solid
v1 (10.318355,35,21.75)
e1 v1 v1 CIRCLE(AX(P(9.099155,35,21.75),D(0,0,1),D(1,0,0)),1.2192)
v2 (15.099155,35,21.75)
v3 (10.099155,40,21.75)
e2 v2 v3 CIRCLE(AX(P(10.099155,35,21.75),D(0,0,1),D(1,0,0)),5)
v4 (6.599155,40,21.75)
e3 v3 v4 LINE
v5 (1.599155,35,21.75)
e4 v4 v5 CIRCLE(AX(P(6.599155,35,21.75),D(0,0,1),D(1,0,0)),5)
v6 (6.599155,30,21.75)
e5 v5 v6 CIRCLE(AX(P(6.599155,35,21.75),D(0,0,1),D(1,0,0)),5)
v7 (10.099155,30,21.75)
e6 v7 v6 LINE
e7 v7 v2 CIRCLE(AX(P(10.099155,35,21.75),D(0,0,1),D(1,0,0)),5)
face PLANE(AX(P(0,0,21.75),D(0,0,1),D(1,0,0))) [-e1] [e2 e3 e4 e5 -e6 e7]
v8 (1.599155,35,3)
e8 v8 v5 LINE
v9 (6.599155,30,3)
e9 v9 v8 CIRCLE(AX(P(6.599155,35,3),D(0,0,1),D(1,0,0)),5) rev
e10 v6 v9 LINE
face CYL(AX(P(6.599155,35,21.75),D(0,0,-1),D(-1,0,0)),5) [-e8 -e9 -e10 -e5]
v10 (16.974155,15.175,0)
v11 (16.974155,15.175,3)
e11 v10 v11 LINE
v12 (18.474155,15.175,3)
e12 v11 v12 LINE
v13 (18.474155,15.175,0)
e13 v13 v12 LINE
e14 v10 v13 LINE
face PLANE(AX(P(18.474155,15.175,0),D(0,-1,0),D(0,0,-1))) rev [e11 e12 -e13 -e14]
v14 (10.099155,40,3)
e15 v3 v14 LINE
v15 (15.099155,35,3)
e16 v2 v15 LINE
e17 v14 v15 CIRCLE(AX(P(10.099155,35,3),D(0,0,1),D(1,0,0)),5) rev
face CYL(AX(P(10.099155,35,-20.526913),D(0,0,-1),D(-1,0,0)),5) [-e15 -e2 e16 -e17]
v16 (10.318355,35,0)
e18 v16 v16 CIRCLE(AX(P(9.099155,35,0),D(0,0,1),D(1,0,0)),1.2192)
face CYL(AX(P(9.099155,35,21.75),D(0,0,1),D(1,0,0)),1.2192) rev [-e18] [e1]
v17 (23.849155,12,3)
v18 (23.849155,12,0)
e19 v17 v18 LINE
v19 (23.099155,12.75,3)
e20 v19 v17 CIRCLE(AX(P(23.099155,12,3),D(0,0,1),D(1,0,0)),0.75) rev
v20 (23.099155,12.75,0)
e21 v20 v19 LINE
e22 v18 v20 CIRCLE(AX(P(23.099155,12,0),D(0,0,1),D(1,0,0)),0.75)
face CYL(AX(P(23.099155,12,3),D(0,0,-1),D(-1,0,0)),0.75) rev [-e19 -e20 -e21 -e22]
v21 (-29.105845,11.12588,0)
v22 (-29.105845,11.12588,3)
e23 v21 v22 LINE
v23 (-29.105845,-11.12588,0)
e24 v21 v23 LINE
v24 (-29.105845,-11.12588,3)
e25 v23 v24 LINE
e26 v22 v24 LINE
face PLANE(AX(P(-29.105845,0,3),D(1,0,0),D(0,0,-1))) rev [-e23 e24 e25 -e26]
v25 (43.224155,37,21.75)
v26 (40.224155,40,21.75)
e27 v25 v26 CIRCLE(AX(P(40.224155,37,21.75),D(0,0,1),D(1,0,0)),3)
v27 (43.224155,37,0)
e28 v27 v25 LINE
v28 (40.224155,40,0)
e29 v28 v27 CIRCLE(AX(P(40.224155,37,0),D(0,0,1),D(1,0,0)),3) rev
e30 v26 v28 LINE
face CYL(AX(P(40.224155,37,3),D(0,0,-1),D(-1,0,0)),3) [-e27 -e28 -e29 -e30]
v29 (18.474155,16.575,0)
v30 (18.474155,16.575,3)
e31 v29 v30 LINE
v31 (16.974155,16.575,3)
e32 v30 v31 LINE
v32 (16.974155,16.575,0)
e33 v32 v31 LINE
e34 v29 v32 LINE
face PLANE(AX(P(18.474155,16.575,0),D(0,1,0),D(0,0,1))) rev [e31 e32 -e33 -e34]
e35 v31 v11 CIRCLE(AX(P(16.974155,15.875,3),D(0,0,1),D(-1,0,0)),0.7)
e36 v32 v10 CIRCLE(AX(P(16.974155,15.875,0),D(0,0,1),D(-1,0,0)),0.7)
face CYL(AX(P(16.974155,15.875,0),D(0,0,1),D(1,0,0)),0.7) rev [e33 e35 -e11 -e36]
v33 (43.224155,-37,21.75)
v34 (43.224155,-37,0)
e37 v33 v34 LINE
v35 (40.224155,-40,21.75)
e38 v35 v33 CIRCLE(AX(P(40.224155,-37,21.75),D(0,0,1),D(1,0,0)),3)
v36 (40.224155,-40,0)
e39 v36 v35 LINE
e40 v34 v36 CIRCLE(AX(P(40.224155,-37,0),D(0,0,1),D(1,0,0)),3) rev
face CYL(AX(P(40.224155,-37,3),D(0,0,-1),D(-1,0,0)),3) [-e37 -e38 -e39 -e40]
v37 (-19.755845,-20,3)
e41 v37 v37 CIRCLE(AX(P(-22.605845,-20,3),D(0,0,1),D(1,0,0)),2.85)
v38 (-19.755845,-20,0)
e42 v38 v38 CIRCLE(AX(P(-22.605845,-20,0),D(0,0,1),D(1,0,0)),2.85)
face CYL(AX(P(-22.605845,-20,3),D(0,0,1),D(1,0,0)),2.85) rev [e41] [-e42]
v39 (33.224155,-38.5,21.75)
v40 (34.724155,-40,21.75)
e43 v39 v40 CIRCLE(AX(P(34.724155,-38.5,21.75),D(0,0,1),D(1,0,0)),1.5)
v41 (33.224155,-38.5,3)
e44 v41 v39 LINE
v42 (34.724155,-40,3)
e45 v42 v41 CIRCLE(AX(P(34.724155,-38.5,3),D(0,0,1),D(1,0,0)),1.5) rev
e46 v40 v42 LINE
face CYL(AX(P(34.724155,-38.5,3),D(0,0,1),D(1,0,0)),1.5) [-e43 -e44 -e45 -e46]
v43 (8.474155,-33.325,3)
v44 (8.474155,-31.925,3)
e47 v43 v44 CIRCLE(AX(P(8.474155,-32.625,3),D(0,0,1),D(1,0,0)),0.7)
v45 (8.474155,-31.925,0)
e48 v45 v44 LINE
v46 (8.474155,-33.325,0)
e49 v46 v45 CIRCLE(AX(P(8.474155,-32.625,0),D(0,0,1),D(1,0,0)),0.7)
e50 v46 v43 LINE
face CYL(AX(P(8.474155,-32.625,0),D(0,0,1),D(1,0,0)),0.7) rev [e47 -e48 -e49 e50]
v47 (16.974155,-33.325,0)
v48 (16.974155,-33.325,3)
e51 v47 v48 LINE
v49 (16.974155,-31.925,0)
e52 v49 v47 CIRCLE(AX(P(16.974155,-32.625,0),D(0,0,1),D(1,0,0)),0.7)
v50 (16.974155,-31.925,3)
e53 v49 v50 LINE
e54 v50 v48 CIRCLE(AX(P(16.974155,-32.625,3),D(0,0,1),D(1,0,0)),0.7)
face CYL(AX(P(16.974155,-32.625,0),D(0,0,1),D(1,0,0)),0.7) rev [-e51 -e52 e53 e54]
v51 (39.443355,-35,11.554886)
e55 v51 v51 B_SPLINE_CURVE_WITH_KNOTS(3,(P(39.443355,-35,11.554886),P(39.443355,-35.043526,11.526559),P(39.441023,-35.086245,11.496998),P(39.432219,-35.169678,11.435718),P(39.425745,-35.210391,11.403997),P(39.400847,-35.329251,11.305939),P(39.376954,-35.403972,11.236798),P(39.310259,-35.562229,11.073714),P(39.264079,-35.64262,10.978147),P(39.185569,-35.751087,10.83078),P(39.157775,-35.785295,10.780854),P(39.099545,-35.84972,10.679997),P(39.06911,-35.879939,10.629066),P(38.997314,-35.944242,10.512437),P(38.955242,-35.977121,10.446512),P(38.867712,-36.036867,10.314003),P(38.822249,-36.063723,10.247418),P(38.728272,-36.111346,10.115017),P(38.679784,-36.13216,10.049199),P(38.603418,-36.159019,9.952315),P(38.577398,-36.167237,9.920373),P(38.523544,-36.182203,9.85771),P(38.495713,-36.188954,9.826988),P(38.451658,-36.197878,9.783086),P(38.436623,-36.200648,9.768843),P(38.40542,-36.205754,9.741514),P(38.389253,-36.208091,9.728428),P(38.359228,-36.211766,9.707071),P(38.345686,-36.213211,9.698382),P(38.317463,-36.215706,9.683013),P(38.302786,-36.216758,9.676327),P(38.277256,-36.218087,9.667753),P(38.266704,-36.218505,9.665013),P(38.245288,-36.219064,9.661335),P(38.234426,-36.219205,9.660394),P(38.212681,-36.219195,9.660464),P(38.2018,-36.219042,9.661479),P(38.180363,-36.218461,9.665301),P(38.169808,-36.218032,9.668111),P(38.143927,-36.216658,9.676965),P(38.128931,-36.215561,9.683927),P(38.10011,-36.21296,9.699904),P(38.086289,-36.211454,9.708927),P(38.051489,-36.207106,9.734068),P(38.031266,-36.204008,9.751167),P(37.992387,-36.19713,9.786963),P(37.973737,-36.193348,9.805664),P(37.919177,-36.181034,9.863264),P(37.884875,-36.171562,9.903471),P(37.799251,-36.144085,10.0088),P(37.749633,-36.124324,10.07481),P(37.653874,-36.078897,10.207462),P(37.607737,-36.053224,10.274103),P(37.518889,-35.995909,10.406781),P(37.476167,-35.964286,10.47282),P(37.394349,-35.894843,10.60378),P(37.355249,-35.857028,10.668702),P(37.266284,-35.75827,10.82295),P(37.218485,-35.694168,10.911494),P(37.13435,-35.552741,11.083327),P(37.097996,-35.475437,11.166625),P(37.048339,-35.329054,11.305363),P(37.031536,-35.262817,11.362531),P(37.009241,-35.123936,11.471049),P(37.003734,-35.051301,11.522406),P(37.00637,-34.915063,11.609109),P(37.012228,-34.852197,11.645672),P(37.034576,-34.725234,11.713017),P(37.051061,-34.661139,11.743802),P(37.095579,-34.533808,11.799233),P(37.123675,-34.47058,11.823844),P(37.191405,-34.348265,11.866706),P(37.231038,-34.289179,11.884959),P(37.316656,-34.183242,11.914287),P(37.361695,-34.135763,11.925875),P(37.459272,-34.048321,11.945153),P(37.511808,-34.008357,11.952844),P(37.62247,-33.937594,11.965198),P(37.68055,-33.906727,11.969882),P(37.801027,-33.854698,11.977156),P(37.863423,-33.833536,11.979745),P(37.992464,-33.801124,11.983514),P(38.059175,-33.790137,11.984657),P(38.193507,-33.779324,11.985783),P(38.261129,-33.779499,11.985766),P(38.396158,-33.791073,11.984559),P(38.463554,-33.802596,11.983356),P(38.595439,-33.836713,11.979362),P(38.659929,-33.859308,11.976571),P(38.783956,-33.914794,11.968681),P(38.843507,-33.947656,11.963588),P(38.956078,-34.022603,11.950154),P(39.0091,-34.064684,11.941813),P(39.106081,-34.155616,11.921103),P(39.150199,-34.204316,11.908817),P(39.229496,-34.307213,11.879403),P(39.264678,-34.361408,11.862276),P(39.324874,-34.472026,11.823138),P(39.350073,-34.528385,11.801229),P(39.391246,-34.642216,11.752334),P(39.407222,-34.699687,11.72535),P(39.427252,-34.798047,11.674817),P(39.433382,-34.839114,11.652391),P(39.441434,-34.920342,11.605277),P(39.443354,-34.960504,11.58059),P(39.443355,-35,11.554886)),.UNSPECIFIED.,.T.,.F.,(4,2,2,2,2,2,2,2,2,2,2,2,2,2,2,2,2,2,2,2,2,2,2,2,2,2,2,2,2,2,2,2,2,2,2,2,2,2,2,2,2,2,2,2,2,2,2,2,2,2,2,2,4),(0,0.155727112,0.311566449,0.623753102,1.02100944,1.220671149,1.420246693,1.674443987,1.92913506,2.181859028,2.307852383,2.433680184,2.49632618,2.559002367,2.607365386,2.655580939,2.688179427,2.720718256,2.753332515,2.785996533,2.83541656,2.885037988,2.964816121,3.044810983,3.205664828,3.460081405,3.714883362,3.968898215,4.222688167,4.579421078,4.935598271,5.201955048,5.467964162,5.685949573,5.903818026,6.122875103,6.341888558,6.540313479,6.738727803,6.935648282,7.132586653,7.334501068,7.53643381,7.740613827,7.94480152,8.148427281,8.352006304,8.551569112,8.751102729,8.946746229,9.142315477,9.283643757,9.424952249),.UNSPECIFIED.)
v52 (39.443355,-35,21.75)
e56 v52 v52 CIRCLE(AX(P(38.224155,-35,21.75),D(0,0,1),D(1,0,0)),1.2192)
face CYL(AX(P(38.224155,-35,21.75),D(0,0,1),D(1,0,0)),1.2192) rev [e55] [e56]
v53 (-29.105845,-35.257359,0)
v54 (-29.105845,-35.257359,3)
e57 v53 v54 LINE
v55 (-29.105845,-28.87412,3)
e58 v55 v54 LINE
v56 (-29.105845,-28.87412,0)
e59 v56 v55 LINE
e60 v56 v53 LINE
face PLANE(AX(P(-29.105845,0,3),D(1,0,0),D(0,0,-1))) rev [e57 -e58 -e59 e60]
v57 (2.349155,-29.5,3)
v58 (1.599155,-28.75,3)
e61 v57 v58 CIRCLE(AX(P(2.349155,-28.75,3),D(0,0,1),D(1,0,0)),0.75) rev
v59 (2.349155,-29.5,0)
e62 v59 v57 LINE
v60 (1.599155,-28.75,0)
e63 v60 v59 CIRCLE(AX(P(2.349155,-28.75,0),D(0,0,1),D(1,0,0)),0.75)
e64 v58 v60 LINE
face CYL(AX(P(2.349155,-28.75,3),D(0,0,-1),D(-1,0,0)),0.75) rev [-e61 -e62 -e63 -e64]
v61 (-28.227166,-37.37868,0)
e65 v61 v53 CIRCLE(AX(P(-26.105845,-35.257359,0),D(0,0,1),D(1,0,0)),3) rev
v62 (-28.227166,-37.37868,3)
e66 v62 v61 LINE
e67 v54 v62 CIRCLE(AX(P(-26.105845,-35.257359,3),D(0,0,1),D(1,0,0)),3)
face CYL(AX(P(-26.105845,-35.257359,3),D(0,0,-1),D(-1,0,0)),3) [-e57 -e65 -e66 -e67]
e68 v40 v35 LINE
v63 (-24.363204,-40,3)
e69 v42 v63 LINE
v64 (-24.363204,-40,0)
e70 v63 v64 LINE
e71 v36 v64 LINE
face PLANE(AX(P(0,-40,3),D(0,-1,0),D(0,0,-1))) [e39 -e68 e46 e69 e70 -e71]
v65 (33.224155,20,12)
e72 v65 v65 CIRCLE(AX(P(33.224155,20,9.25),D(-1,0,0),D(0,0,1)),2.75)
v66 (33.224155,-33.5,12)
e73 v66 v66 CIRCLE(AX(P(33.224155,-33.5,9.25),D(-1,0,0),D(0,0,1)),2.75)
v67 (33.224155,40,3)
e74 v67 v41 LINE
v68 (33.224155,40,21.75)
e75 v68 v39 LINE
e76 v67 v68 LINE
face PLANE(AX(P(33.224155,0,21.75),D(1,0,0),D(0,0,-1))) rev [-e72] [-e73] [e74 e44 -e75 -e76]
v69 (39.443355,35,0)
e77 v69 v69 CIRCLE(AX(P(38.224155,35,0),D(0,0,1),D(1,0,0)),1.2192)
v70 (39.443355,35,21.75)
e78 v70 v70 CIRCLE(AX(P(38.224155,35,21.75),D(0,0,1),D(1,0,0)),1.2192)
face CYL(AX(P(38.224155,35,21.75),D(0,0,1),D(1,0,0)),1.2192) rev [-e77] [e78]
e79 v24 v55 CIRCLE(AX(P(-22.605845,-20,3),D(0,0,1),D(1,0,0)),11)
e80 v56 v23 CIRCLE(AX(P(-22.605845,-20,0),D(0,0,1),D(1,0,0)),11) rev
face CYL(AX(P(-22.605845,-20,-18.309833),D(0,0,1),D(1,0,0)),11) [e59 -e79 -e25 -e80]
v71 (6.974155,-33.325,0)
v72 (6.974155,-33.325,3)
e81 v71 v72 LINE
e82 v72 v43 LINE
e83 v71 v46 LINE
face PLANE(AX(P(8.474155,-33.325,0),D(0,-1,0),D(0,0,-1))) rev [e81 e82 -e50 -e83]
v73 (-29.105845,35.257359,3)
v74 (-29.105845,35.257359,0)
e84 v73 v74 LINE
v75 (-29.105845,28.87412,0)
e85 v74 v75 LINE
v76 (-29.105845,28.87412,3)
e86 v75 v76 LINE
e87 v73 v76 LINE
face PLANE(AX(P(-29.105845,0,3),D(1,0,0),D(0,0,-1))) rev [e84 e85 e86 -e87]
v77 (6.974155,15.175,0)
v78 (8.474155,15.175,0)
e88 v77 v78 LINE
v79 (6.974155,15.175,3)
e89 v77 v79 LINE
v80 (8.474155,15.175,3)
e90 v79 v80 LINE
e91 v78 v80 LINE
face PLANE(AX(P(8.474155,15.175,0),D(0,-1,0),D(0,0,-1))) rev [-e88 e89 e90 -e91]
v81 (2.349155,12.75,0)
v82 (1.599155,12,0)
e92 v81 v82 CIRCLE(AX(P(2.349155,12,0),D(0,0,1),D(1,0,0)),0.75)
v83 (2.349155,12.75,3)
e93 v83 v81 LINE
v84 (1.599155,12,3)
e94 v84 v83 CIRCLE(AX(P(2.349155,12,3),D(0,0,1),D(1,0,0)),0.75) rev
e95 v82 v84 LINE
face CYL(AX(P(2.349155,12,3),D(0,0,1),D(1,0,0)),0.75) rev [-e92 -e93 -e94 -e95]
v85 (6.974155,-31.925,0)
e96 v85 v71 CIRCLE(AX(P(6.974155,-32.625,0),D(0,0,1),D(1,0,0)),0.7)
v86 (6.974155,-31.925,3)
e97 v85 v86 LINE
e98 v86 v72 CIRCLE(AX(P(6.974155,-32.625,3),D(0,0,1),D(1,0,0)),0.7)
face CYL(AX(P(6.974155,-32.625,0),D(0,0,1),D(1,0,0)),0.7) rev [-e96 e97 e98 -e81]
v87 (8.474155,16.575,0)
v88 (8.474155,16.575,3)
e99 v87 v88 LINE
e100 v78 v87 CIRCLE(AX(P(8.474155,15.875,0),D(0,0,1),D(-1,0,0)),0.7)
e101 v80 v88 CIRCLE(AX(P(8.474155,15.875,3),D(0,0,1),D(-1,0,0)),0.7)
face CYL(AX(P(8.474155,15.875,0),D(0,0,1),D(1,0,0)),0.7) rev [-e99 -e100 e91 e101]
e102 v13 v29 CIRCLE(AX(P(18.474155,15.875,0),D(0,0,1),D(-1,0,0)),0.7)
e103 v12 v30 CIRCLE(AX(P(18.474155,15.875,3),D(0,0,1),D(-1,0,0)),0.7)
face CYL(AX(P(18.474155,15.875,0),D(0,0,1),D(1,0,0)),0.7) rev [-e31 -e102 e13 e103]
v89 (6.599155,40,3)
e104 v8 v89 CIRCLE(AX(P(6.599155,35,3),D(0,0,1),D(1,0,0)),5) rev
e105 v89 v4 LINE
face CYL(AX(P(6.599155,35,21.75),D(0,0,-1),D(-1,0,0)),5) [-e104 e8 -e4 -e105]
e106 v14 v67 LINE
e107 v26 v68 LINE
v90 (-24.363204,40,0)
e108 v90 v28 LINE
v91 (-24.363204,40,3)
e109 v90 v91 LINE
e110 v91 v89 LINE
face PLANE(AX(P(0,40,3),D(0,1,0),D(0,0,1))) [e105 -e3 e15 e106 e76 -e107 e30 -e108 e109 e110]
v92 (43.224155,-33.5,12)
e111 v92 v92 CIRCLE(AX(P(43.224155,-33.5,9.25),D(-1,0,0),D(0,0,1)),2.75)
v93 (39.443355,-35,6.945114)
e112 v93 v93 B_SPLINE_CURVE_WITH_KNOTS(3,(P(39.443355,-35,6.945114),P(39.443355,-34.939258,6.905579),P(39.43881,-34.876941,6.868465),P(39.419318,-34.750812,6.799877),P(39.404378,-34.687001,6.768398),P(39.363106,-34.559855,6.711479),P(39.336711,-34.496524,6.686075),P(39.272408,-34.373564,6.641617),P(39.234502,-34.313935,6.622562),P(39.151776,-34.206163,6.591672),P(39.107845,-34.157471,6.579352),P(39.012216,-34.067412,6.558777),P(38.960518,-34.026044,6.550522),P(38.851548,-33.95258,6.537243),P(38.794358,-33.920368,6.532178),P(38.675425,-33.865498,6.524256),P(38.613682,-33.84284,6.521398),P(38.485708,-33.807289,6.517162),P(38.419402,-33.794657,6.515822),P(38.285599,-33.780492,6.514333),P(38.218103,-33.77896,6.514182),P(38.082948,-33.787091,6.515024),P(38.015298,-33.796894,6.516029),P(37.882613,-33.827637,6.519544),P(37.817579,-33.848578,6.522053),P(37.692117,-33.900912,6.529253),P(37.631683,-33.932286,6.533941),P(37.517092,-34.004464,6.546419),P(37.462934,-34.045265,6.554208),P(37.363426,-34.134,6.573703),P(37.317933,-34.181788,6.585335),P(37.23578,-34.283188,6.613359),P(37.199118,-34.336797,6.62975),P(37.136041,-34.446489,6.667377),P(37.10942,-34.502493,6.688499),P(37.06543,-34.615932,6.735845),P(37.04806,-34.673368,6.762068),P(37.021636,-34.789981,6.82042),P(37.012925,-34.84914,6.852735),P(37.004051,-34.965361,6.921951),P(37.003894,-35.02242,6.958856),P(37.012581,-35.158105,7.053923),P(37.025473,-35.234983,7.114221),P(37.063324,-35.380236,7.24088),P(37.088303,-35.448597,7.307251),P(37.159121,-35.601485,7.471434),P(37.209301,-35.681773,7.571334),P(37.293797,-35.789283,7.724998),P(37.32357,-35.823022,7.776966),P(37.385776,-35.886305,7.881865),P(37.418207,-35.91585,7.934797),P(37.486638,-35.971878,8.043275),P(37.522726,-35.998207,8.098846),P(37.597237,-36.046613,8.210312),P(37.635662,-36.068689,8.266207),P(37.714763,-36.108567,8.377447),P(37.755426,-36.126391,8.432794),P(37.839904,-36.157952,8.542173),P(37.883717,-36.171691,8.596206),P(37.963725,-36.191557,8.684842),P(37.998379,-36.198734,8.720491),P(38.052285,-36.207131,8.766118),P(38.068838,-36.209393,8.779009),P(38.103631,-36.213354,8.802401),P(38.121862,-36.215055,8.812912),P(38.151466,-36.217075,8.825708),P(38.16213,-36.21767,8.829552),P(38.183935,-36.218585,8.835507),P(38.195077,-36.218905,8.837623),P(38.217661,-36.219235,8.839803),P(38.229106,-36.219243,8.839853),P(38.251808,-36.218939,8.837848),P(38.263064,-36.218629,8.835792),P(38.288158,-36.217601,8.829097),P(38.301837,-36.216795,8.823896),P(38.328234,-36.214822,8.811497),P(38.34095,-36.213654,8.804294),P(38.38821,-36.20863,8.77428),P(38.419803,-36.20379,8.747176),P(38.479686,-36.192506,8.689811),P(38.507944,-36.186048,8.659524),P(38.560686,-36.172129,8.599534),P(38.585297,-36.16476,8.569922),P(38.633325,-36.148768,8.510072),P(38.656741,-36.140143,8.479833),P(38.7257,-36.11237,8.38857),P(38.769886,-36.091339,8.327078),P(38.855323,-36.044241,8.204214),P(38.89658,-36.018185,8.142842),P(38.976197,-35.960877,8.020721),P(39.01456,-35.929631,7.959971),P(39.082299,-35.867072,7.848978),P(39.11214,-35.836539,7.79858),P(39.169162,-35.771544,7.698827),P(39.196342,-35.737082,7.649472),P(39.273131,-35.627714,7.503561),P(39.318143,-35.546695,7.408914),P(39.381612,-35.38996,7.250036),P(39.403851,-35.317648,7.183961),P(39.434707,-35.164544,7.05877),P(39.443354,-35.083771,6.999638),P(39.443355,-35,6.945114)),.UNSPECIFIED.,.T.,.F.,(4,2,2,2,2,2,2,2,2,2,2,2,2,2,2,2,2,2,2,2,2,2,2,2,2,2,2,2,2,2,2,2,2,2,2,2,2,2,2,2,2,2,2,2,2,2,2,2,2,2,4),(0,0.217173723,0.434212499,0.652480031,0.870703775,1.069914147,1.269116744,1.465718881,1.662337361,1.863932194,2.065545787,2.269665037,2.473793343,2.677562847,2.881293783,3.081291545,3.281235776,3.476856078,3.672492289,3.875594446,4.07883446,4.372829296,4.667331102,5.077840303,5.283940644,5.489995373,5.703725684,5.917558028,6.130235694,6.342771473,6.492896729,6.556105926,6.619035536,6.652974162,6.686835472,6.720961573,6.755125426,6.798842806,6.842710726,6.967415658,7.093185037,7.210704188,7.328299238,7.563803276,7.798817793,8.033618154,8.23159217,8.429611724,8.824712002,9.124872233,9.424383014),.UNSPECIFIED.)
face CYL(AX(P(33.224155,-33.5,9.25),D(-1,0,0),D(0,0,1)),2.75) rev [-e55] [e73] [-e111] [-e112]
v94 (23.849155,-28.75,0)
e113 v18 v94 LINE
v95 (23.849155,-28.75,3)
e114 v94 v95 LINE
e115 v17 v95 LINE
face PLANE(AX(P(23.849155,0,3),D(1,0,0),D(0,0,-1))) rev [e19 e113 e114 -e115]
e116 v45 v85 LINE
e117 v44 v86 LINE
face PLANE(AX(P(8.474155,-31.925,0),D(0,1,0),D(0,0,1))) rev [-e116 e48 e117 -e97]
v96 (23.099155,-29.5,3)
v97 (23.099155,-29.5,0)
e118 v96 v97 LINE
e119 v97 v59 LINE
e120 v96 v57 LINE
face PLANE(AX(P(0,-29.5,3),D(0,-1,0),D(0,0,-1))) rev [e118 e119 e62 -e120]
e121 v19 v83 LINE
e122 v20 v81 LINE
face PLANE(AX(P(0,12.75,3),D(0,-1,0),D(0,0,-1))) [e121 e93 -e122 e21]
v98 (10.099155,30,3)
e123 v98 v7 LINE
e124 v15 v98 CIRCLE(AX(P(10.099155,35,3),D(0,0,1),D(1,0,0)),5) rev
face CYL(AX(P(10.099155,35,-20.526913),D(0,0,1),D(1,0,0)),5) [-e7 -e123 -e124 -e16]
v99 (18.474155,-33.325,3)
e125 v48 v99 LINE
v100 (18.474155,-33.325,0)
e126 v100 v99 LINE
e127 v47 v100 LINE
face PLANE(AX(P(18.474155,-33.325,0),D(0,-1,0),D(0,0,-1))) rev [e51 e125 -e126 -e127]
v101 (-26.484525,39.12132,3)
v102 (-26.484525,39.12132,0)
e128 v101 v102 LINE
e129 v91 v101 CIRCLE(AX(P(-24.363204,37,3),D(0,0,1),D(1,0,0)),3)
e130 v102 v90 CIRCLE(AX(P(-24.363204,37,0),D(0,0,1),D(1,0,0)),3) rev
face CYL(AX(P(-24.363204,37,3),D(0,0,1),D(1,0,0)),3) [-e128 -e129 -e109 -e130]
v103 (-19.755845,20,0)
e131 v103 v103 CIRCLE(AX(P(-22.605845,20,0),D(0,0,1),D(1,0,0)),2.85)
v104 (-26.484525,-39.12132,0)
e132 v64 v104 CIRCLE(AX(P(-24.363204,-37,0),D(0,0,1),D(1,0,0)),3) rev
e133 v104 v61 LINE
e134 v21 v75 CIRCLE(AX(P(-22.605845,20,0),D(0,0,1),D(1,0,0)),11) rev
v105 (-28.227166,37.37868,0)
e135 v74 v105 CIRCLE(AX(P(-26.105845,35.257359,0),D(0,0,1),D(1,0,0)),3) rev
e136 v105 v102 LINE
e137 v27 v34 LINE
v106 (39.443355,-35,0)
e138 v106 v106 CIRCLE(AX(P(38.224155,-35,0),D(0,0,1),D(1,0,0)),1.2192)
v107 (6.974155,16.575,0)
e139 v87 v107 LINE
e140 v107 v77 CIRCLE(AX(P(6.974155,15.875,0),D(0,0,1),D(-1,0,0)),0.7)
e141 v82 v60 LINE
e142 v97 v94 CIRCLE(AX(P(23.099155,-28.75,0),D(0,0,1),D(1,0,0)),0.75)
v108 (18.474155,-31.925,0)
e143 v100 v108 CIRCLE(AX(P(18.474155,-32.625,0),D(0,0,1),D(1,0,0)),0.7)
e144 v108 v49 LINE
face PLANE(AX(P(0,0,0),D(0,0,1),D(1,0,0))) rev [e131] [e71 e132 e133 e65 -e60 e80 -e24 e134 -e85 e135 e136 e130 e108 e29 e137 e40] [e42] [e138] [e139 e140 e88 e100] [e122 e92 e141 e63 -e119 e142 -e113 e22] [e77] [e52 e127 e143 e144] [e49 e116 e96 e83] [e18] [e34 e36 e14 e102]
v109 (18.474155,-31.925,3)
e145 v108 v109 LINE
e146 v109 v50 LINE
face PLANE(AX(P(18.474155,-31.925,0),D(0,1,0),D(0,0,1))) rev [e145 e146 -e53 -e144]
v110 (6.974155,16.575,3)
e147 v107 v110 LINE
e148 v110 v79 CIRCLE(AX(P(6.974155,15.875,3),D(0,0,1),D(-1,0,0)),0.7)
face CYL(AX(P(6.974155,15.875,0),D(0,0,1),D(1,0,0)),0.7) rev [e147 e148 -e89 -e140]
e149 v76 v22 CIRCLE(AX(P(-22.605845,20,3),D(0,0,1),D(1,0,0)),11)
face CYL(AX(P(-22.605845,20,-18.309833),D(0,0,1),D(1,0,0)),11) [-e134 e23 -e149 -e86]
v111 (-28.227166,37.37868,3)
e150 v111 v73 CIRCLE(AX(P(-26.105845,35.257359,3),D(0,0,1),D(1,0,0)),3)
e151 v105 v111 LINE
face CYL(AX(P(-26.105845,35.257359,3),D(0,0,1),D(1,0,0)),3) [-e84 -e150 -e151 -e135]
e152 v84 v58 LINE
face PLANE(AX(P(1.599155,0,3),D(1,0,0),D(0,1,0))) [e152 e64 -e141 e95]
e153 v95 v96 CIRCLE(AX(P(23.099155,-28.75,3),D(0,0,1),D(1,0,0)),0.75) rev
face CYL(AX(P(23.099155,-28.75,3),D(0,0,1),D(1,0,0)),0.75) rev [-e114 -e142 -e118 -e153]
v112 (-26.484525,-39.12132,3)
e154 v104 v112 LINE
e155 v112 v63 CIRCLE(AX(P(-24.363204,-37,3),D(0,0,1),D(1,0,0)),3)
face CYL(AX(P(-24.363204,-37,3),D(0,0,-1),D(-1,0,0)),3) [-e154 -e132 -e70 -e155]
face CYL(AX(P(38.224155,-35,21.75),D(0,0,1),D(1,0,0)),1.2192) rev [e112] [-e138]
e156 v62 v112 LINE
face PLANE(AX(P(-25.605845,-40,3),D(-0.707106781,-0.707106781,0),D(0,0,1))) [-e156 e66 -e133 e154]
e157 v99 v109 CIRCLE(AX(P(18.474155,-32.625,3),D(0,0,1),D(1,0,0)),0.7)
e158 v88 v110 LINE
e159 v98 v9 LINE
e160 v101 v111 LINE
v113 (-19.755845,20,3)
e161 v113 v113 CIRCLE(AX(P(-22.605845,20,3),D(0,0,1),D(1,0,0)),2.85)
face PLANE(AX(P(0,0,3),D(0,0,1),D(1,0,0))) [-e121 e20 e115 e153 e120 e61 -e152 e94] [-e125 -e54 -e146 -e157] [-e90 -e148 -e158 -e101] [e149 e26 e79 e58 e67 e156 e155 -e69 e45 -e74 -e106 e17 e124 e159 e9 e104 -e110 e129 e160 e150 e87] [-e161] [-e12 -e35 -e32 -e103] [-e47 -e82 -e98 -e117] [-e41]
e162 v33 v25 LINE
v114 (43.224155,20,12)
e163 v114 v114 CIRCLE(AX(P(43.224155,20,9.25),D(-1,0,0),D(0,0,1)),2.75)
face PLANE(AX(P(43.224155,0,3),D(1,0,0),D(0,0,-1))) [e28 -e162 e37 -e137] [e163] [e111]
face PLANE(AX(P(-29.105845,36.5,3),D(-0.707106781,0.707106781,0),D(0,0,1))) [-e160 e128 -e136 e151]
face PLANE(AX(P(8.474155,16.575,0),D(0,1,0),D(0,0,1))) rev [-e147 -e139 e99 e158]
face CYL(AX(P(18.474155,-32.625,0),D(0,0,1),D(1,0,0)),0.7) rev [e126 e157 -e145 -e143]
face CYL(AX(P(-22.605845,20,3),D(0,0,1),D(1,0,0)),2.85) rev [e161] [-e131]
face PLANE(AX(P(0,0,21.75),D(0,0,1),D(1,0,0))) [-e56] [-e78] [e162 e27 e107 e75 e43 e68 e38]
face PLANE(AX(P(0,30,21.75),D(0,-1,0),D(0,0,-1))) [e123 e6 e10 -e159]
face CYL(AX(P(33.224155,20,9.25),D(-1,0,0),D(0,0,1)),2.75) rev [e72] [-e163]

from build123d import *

# Parameters (mm, degrees)
BASE_W                 = 22.25
BASE_H                 = 42.25
MAIN_DEPTH             = 3
GEAR_AXIS_HOLES_D      = 5.7
M1_6_CLEARANCE_HOLE1_D = 1.4
BOSS_EXTRUDE1_DEPTH    = 18.75
FILLET2_R              = 0.75
FILLET4_R              = 5
FILLET8_R              = 1.5
BOSS_EXTRUDE2_DEPTH    = 3
CHAMFER1_SIZE          = 3.5
FILLET6_R              = 3
CUT_EXTRUDE1_DEPTH     = 62.805259158
F_2_CLEARANCE_HOLE1_D  = 2.4384
M5_CLEARANCE_HOLE1_D   = 5.5
SKETCH20_W             = 18.125
SKETCH20_H             = 15
CUT_EXTRUDE2_DEPTH     = 18.75
FILLET7_R              = 5


with BuildPart() as part:
    # Base → Main (new body)
    with BuildSketch(Plane.XY):
        Polygon((-29.105845183, 40), (-29.105845183, -40), (-17.775845183, -40), (43.224154817, -40), (43.224154817, 40), align=None)
        with Locations((12.724154817, -8.375)):
            Rectangle(BASE_W, BASE_H, mode=Mode.SUBTRACT)
    extrude(amount=MAIN_DEPTH)

    # Gear Axis Holes (through all)
    with Locations(Plane(origin=(0, 0, 3), x_dir=(-1, 0, 0), z_dir=(0, 0, 1))):
        with Locations((22.605845183, 20), (22.605845183, -20)):
            Hole(GEAR_AXIS_HOLES_D / 2)

    # M1.6 Clearance Hole1 (through all)
    with Locations(Plane.XY.offset(3)):
        with Locations((17.724154817, -32.625), (7.724154817, -32.625), (7.724154817, 15.875), (17.724154817, 15.875)):
            Hole(M1_6_CLEARANCE_HOLE1_D / 2)

    # Sketch13 → Boss-Extrude1 (add)
    with BuildSketch(Plane.XY.offset(3)):
        Polygon((1.599154817, 30), (33.224154817, 30), (33.224154817, 1), (33.224154817, -30), (33.224154817, -40), (43.224154817, -40), (43.224154817, 1), (43.224154817, 40), (1.599154817, 40), align=None)
    extrude(amount=BOSS_EXTRUDE1_DEPTH)

    # Fillet2
    fillet2_edges = [part.edges().sort_by_distance(p)[0] for p in [
        (1.599154817, -29.5, 1.5),
        (23.849154817, -29.5, 1.5),
        (23.849154817, 12.75, 1.5),
        (1.599154817, 12.75, 1.5),
    ]]
    fillet(fillet2_edges, radius=FILLET2_R)

    # Fillet4
    fillet4_edges = [part.edges().sort_by_distance(p)[0] for p in [
        (1.599154817, 40, 12.375),
        (1.599154817, 30, 12.375),
        (33.224154817, 30, 12.375),
    ]]
    fillet(fillet4_edges, radius=FILLET4_R - 0.0001)  # a hair under: the kernel refuses the full size

    # Fillet8
    fillet8_edges = [part.edges().sort_by_distance(p)[0] for p in [
        (33.224154817, -40, 12.375),
    ]]
    fillet(fillet8_edges, radius=FILLET8_R)

    # Sketch21 → Boss-Extrude2 (add)
    with BuildSketch(Plane.XY.offset(3)):
        with BuildLine():
            Line((-29.105845183, 28.874119675), (-29.105845183, 11.125880325))
            ThreePointArc((-29.105845183, 11.125880325), (-33.605845183, 20), (-29.105845183, 28.874119675))
        make_face()
        with BuildLine():
            Line((-29.105845183, -11.125880325), (-29.105845183, -28.874119675))
            ThreePointArc((-29.105845183, -28.874119675), (-33.605845183, -20), (-29.105845183, -11.125880325))
        make_face()
    extrude(amount=-BOSS_EXTRUDE2_DEPTH)

    # Chamfer1
    chamfer1_edges = [part.edges().sort_by_distance(p)[0] for p in [
        (-29.105845183, -40, 1.5),
        (-29.105845183, 40, 1.5),
    ]]
    chamfer(chamfer1_edges, length=CHAMFER1_SIZE)

    # Fillet6
    fillet6_edges = [part.edges().sort_by_distance(p)[0] for p in [
        (-25.605845183, -40, 1.5),
        (-29.105845183, -36.5, 1.5),
        (-29.105845183, 36.5, 1.5),
        (-25.605845183, 40, 1.5),
        (43.224154817, 40, 10.875),
        (43.224154817, -40, 10.875),
    ]]
    fillet(fillet6_edges, radius=FILLET6_R)

    # Sketch14 → Cut-Extrude1 (cut, through all)
    with BuildSketch(Plane.XY.offset(3)):
        with BuildLine():
            Line((8.474154817, -33.325), (6.974154817, -33.325))
            ThreePointArc((6.974154817, -33.325), (6.274154817, -32.625), (6.974154817, -31.925))
            Line((6.974154817, -31.925), (8.474154817, -31.925))
            ThreePointArc((8.474154817, -31.925), (9.174154817, -32.625), (8.474154817, -33.325))
        make_face()
        with BuildLine():
            Line((18.474154817, -33.325), (16.974154817, -33.325))
            ThreePointArc((16.974154817, -33.325), (16.274154817, -32.625), (16.974154817, -31.925))
            Line((16.974154817, -31.925), (18.474154817, -31.925))
            ThreePointArc((18.474154817, -31.925), (19.174154817, -32.625), (18.474154817, -33.325))
        make_face()
        with BuildLine():
            Line((8.474154817, 16.575), (6.974154817, 16.575))
            ThreePointArc((6.974154817, 16.575), (6.274154817, 15.875), (6.974154817, 15.175))
            Line((6.974154817, 15.175), (8.474154817, 15.175))
            ThreePointArc((8.474154817, 15.175), (9.174154817, 15.875), (8.474154817, 16.575))
        make_face()
        with BuildLine():
            Line((18.474154817, 16.575), (16.974154817, 16.575))
            ThreePointArc((16.974154817, 16.575), (16.274154817, 15.875), (16.974154817, 15.175))
            Line((16.974154817, 15.175), (18.474154817, 15.175))
            ThreePointArc((18.474154817, 15.175), (19.174154817, 15.875), (18.474154817, 16.575))
        make_face()
    extrude(amount=-CUT_EXTRUDE1_DEPTH, mode=Mode.SUBTRACT)

    # #2 Clearance Hole1 (through all)
    with Locations(Plane.XY.offset(21.75)):
        with Locations((9.099154817, 35), (38.224154817, 35), (38.224154817, -35)):
            Hole(F_2_CLEARANCE_HOLE1_D / 2)

    # M5 Clearance Hole1 (through all)
    with Locations(Plane.ZY.offset(-33.224154817)):
        with Locations((9.25, 20), (9.25, -33.5)):
            Hole(M5_CLEARANCE_HOLE1_D / 2)

    # Sketch20 → Cut-Extrude2 (cut)
    with BuildSketch(Plane.XY.offset(21.75)):
        with Locations((24.161654817, 32.5)):
            Rectangle(SKETCH20_W, SKETCH20_H)
    extrude(amount=-CUT_EXTRUDE2_DEPTH, mode=Mode.SUBTRACT)

    # Fillet7
    fillet7_edges = [part.edges().sort_by_distance(p)[0] for p in [
        (15.099154817, 40, 12.375),
        (15.099154817, 30, 12.375),
    ]]
    fillet(fillet7_edges, radius=FILLET7_R - 0.0001)  # a hair under: the kernel refuses the full size


solid = part.part
